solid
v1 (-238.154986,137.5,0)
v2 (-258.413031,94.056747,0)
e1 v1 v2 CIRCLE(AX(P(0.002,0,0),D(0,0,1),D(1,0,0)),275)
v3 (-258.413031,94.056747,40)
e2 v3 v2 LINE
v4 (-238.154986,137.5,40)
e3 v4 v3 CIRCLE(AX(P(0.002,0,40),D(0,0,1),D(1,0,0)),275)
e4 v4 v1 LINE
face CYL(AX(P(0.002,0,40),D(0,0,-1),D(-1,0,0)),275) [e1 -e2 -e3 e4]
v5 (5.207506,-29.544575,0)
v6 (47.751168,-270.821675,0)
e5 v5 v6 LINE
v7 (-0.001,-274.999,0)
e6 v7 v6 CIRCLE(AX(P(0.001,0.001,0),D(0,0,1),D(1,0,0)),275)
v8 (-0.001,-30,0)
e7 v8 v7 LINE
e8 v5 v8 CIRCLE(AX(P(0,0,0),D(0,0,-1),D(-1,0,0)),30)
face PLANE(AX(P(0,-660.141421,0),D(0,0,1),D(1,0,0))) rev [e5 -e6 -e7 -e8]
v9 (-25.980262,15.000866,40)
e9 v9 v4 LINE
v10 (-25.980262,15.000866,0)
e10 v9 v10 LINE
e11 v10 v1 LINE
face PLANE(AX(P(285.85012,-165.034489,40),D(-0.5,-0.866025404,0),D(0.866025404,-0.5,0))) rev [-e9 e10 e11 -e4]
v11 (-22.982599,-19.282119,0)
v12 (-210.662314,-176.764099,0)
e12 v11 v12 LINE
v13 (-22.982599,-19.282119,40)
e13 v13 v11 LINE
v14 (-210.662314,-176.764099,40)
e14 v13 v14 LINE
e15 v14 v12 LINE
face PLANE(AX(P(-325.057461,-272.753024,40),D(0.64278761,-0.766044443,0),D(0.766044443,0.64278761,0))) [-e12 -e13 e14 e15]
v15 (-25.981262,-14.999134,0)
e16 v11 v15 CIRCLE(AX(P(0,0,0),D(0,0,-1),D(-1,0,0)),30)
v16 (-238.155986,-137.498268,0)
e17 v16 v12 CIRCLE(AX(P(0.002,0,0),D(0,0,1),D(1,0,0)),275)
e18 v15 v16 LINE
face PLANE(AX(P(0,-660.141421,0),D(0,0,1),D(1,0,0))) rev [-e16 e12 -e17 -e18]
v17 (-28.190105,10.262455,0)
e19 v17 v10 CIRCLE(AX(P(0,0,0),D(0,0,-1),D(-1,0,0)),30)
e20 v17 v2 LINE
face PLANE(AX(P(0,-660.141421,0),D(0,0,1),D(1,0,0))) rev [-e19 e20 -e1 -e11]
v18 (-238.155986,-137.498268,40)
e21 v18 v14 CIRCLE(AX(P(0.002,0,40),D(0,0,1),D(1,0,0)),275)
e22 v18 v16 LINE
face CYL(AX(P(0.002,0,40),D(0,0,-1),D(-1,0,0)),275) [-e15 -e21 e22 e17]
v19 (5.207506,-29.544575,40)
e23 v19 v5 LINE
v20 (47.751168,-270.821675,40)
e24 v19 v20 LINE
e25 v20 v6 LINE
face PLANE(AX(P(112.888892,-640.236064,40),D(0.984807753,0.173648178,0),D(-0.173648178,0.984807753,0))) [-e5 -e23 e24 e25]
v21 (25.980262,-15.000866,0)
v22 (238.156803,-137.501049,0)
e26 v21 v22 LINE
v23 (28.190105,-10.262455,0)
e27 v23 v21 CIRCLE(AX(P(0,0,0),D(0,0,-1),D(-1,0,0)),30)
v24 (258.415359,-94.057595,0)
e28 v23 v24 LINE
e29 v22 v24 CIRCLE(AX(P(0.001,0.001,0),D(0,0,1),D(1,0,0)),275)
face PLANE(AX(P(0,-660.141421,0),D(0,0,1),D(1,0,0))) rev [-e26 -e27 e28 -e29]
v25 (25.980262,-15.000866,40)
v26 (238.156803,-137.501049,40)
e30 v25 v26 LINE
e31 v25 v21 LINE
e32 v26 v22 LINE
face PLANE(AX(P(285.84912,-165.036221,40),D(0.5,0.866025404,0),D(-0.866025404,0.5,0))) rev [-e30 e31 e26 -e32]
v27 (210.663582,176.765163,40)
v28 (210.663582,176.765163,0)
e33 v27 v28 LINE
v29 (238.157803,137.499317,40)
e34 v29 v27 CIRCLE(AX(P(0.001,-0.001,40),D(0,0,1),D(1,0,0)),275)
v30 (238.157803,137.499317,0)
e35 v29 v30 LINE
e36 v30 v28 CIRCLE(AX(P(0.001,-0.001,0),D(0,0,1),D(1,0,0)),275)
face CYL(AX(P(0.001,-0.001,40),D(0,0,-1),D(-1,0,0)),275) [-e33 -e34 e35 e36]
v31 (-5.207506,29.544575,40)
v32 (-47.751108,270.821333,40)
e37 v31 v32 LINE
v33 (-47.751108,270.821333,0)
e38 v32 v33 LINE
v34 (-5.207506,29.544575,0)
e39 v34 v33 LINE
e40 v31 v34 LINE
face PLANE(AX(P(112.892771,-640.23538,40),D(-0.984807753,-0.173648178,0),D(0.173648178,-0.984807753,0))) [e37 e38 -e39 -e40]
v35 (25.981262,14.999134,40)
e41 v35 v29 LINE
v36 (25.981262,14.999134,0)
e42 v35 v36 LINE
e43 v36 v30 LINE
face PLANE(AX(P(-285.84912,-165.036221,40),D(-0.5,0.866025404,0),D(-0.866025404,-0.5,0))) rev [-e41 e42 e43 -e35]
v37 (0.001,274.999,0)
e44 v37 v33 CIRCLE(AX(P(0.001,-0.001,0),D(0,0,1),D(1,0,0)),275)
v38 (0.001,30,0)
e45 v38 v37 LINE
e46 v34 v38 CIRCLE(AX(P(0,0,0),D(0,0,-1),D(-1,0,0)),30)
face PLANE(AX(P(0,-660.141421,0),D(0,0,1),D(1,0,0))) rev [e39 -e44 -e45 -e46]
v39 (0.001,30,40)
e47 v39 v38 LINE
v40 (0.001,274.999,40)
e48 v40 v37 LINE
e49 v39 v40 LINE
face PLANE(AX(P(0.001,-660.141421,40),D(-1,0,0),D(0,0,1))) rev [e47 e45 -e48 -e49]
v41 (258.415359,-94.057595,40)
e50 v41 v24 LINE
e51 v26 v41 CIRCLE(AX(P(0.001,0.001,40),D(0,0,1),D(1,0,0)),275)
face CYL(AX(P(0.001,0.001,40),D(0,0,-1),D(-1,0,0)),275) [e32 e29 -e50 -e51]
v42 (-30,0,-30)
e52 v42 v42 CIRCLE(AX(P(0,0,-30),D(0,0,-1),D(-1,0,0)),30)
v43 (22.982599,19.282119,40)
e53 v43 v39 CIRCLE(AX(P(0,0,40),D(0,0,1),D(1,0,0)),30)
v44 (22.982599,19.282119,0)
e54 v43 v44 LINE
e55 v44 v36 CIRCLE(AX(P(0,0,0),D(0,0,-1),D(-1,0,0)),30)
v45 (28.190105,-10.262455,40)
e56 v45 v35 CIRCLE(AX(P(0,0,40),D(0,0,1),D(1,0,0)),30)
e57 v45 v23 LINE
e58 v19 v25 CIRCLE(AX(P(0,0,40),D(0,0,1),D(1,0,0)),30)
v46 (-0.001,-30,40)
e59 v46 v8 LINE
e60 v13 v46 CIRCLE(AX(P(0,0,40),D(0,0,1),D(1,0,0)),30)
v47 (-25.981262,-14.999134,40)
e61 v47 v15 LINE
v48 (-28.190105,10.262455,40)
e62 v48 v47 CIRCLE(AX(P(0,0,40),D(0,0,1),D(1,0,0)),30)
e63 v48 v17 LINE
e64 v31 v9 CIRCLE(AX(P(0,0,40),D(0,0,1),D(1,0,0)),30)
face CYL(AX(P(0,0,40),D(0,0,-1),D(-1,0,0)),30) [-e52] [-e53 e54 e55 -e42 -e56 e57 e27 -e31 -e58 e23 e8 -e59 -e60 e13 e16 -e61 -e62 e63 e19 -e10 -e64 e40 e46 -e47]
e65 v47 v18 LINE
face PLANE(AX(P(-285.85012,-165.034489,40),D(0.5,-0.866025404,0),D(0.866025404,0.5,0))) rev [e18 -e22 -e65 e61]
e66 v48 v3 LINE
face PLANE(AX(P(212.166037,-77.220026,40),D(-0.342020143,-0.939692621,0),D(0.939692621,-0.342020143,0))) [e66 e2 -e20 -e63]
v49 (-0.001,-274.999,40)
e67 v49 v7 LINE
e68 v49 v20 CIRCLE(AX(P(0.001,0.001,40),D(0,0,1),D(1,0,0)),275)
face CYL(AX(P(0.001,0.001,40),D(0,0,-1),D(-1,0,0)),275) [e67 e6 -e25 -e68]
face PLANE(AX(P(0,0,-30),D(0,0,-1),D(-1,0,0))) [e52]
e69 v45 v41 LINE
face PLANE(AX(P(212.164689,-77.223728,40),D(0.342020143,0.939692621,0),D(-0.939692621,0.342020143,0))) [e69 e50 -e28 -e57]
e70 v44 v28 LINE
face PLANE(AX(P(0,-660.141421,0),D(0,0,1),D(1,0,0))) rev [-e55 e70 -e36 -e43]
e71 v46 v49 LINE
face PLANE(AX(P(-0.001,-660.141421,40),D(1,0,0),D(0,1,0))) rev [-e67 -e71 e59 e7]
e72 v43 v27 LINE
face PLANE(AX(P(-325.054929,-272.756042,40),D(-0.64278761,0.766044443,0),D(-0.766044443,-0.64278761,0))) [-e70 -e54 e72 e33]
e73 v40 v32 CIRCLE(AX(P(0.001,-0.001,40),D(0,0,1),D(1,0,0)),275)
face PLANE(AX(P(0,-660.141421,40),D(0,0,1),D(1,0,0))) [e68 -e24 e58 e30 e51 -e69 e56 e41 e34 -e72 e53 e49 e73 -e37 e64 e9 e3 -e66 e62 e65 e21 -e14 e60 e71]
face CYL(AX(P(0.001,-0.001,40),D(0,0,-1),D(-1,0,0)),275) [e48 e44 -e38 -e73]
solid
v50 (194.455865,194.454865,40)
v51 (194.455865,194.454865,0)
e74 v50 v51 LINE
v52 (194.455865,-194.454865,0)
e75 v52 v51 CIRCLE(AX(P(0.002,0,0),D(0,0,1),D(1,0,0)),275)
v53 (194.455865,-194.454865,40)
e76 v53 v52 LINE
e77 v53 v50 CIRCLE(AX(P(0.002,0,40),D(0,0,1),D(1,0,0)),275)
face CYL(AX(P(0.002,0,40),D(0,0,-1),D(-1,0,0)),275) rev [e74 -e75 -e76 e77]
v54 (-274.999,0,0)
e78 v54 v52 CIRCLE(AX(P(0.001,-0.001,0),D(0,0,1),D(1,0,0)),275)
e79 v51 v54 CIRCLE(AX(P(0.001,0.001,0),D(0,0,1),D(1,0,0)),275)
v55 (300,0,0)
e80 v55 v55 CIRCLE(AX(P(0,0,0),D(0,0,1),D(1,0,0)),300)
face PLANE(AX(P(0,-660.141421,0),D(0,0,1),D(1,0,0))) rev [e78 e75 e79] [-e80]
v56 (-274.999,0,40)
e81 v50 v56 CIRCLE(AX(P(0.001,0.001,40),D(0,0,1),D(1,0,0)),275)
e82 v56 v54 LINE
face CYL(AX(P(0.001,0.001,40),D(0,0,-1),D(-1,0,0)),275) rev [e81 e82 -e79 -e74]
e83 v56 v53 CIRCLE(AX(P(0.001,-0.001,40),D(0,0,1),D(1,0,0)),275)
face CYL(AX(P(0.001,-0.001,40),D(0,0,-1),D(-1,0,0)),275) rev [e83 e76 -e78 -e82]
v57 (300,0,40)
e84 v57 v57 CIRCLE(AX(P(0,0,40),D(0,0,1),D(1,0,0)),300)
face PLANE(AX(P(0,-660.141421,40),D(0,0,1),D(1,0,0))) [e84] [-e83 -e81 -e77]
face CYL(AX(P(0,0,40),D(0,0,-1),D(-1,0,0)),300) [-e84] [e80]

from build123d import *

# Parameters (mm, degrees)
EXTRUDE_8_OUTLINE_R = 300
EXTRUDE_8_DEPTH     = 40
EXTRUDE_START       = 30
SKETCH_2_R          = 30
EXTRUDE_9_DEPTH     = 30


# Read off the part's stored shape, not the designer's step: 凸台-拉伸8
with BuildPart() as part:
    # 凸台-拉伸8 outline → 凸台-拉伸8 (new body)
    # profile 1 of 2: a face of its own
    with BuildSketch(Plane.XY):
        Circle(EXTRUDE_8_OUTLINE_R)
        with BuildLine():
            ThreePointArc((194.455864826, 194.454864826), (275.002, 0), (194.455864826, -194.454864826))
            ThreePointArc((194.455864826, -194.454864826), (-105.237079199, -254.067815398), (-274.998999998, 0))
            ThreePointArc((-274.998999998, 0), (-105.237079199, 254.067815398), (194.455864826, 194.454864826))
        make_face(mode=Mode.SUBTRACT)
    # profile 2 of 2: a face of its own
    with BuildSketch(Plane.XY):
        with BuildLine():
            Line((0.001, 29.999999983), (0.001, 274.999))
            ThreePointArc((0.001, 274.999), (-23.966252232, 273.952592458), (-47.751108002, 270.82133324))
            Line((-47.751108002, 270.82133324), (-5.207505626, 29.544574547))
            ThreePointArc((-5.207505626, 29.544574547), (-17.206076786, 24.575412949), (-25.980262099, 15.000866017))
            Line((-25.980262099, 15.000866017), (-238.154986041, 137.5))
            ThreePointArc((-238.154986041, 137.5), (-249.232369781, 116.220604542), (-258.413031021, 94.056747459))
            Line((-258.413031021, 94.056747459), (-28.190104915, 10.262455111))
            ThreePointArc((-28.190104915, 10.262455111), (-29.885970316, -2.613193121), (-25.981262099, -14.999133966))
            Line((-25.981262099, -14.999133966), (-238.155986034, -137.498267946))
            ThreePointArc((-238.155986034, -137.498267946), (-225.266319296, -157.73136759), (-210.662314239, -176.764099031))
            Line((-210.662314239, -176.764099031), (-22.982599288, -19.282119436))
            ThreePointArc((-22.982599288, -19.282119436), (-12.679893529, -27.188606071), (-0.001, -29.999999983))
            Line((-0.001, -29.999999983), (-0.001, -274.998999993))
            ThreePointArc((-0.001, -274.998999993), (23.966274976, -273.952765434), (47.751168306, -270.821675245))
            Line((47.751168306, -270.821675245), (5.207505626, -29.544574547))
            ThreePointArc((5.207505626, -29.544574547), (17.206076786, -24.575412949), (25.980262099, -15.000866017))
            Line((25.980262099, -15.000866017), (238.156803019, -137.501049033))
            ThreePointArc((238.156803019, -137.501049033), (249.234454424, -116.221567498), (258.415358678, -94.057594657))
            Line((258.415358678, -94.057594657), (28.190104915, -10.262455111))
            ThreePointArc((28.190104915, -10.262455111), (29.885970316, 2.613193121), (25.981262099, 14.999133966))
            Line((25.981262099, 14.999133966), (238.157803028, 137.499316987))
            ThreePointArc((238.157803028, 137.499316987), (225.267868034, 157.732440228), (210.663582322, 176.765163078))
            Line((210.663582322, 176.765163078), (22.982599288, 19.282119436))
            ThreePointArc((22.982599288, 19.282119436), (12.679893529, 27.188606071), (0.001, 29.999999983))
        make_face()
    extrude(amount=EXTRUDE_8_DEPTH)

    # 草图2 → 凸台-拉伸9 (add)
    with BuildSketch(Plane(origin=(0, 0, 0), x_dir=(-1, 0, 0), z_dir=(0, 0, -1)).offset(EXTRUDE_START)):
        Circle(SKETCH_2_R)
    extrude(amount=-EXTRUDE_9_DEPTH)


solid = part.part
